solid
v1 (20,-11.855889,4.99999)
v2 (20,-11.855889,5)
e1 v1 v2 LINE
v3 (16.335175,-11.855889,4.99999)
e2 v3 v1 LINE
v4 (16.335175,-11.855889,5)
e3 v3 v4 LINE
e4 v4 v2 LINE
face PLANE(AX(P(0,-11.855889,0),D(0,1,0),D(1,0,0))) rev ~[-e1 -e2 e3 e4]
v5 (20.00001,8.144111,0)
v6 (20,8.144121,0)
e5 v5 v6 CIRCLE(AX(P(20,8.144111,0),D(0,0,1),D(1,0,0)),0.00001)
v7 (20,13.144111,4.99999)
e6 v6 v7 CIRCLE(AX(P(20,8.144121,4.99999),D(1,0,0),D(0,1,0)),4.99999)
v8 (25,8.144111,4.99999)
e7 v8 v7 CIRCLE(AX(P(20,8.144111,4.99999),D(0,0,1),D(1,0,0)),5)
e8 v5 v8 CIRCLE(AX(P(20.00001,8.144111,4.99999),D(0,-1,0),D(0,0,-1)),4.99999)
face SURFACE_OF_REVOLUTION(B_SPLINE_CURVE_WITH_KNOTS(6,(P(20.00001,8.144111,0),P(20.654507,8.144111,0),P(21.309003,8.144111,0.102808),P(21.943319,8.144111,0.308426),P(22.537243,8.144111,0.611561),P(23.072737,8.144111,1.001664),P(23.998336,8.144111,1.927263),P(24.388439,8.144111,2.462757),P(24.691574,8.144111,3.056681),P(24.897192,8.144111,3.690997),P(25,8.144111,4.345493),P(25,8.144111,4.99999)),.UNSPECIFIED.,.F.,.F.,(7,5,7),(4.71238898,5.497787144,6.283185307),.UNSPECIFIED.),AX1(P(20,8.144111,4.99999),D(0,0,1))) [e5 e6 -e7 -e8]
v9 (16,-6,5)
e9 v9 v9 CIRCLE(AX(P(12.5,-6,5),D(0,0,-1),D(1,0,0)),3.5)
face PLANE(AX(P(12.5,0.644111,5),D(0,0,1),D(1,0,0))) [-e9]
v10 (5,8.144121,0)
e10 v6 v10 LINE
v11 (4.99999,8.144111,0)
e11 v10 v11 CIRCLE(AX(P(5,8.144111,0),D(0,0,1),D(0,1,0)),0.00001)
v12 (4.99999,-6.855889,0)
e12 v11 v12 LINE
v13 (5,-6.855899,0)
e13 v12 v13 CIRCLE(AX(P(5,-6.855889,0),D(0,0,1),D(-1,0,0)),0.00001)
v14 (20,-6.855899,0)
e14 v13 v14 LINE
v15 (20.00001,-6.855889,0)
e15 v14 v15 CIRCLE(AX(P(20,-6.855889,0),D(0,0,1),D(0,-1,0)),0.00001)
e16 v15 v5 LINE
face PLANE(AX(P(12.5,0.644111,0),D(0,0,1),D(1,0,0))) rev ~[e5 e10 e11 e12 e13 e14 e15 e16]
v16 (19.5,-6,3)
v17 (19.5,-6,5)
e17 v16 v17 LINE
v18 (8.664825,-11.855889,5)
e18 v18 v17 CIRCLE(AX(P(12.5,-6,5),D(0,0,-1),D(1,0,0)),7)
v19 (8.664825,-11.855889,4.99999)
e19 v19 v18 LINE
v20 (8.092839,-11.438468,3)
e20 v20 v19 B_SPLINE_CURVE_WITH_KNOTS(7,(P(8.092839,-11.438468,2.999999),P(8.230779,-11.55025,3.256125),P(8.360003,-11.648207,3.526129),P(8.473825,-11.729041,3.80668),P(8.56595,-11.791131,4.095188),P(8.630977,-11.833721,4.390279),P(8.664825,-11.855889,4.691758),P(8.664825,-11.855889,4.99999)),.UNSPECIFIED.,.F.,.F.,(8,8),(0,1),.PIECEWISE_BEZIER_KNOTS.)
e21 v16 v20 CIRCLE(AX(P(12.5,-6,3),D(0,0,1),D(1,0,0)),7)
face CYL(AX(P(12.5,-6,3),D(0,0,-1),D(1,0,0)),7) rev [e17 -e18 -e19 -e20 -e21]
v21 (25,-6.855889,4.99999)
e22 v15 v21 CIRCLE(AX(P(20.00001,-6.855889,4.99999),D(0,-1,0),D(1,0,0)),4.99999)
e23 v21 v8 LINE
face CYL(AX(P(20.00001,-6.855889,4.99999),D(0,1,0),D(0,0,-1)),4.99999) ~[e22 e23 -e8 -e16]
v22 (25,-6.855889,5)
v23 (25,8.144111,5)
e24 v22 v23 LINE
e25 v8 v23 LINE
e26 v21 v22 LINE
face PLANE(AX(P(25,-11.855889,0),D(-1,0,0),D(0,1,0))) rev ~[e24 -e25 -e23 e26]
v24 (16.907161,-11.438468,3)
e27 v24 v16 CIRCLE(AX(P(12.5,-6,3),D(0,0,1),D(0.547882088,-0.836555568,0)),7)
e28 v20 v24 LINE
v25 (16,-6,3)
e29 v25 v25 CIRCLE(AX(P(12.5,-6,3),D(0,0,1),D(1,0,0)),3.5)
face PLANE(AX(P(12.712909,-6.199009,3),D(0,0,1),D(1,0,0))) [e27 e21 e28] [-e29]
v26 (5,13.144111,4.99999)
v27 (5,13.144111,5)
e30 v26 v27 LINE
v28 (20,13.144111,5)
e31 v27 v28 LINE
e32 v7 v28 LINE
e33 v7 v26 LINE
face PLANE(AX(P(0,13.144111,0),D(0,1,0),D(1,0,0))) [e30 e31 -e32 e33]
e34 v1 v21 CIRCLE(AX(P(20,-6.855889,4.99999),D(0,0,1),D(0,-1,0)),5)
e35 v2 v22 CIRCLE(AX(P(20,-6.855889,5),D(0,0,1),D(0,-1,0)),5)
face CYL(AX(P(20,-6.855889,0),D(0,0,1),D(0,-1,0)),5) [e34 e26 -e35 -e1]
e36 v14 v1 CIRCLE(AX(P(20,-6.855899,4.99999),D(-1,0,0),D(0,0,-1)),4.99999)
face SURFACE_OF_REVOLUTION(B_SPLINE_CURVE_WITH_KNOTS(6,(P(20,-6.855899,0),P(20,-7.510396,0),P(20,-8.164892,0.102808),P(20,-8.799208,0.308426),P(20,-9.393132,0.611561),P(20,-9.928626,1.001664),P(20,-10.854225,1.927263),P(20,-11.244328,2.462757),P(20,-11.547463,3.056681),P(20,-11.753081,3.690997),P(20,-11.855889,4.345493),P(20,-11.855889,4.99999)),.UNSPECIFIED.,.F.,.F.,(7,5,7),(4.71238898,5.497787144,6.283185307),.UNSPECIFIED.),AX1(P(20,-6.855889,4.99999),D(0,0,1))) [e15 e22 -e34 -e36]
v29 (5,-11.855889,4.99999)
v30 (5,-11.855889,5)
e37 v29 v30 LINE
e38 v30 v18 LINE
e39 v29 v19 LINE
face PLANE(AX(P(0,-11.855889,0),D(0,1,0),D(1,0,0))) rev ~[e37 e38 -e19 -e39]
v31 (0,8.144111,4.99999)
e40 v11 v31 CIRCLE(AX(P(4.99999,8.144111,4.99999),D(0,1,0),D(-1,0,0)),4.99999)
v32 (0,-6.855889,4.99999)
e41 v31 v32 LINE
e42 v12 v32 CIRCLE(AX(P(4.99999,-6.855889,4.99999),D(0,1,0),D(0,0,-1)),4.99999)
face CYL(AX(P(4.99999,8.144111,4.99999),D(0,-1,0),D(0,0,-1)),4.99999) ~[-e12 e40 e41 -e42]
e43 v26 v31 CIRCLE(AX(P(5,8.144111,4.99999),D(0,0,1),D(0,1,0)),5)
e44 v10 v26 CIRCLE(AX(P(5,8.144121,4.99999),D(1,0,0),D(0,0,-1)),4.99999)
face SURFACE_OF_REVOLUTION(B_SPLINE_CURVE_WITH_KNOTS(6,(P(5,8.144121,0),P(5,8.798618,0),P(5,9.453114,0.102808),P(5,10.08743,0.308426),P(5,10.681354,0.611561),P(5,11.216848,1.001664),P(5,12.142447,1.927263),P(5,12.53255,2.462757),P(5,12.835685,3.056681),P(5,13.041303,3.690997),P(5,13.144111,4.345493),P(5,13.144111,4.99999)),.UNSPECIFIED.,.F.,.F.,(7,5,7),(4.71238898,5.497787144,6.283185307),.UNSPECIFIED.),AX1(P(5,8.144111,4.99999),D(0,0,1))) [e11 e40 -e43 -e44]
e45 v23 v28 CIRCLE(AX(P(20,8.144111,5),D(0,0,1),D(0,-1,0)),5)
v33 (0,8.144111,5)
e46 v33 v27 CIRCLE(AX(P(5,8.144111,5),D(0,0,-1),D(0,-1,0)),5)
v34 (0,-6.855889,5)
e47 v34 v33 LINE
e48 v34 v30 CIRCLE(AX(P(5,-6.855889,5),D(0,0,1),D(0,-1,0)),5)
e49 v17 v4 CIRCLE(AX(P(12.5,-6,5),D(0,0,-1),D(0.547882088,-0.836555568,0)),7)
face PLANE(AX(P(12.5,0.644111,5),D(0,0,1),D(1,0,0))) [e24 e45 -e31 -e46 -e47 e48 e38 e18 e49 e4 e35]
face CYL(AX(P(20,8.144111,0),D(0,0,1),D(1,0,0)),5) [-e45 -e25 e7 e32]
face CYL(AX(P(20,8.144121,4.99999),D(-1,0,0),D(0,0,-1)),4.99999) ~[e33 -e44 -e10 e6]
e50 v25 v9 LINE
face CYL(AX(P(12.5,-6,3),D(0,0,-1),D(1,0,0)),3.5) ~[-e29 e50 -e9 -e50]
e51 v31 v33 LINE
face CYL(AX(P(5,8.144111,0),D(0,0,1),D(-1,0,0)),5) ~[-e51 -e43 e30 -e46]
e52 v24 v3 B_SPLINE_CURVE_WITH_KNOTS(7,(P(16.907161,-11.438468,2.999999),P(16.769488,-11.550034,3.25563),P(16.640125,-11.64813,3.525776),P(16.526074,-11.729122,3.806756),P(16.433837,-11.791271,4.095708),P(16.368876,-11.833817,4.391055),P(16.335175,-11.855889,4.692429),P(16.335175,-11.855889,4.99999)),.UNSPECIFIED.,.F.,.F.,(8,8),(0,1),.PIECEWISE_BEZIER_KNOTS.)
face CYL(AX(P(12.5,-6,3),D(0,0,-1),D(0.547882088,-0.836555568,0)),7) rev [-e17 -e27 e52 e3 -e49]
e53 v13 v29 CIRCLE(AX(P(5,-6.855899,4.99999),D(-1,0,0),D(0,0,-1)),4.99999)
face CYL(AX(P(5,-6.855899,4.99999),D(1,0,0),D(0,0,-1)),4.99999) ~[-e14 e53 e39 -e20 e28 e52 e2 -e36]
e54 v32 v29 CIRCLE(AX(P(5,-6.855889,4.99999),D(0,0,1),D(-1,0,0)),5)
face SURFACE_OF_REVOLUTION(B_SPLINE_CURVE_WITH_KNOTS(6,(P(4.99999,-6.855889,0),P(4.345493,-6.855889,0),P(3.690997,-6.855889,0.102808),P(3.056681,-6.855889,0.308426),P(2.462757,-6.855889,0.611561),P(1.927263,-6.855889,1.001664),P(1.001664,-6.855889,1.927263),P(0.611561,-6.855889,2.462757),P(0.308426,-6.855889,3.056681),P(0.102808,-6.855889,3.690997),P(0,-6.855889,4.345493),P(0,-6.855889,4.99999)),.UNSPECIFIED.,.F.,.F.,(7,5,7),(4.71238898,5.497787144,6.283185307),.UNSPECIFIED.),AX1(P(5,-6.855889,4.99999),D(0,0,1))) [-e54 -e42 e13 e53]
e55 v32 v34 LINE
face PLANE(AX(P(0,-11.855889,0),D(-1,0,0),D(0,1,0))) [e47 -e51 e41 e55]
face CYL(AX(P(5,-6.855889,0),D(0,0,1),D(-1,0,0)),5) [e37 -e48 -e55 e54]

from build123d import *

# Parameters (mm, degrees)
F0_W     = 25
F0_H     = 25
F1_DEPTH = 5
F2_R     = 5
F3_R     = 4.99999
F5_START = 3
F4_R     = 3.5
F5_DEPTH = 22


# Not quite as in the source:
# - a fillet or chamfer is up to 0.001 mm smaller than in the source, because OpenCascade refuses the exact size


with BuildPart() as f1:
    # F0 (on Top) → F1 (new body)
    with BuildSketch(Plane.XY):
        with Locations((12.5, 0.6441110272)):
            Rectangle(F0_W, F0_H)
    extrude(amount=F1_DEPTH)

    # F2
    f2_edges = [f1.edges().sort_by_distance(p)[0] for p in [
        (0, 13.144111, 2.5),
        (25, 13.144111, 2.5),
        (0, -11.855889, 2.5),
        (25, -11.855889, 2.5),
    ]]
    fillet(f2_edges, radius=F2_R)

    # F3 (radius 5 in the source; OpenCascade refuses exactly that, so slightly less here)
    f3_edges = [f1.edges().sort_by_distance(p)[0] for p in [
        (12.5, -11.855889, 0),
        (0, 0.644111, 0),
        (25, 0.644111, 0),
        (12.5, 13.144111, 0),
    ]]
    fillet(f3_edges, radius=F3_R)

    # F4 (on Top) → F5 (cut)
    with BuildSketch(Plane.XY.offset(F5_START)):
        with BuildLine():
            ThreePointArc((19.5, -6), (9.1718039657, 0.1581743364), (8.6648253836, -11.8558889728))
            Line((8.6648253836, -11.8558889728), (16.3351746164, -11.8558889728))
            ThreePointArc((16.3351746164, -11.8558889728), (18.6581743364, -9.3281960343), (19.5, -6))
        make_face()
        with Locations((12.5, -6)):
            Circle(F4_R, mode=Mode.SUBTRACT)
    extrude(amount=F5_DEPTH, mode=Mode.SUBTRACT)


solid = f1.part
